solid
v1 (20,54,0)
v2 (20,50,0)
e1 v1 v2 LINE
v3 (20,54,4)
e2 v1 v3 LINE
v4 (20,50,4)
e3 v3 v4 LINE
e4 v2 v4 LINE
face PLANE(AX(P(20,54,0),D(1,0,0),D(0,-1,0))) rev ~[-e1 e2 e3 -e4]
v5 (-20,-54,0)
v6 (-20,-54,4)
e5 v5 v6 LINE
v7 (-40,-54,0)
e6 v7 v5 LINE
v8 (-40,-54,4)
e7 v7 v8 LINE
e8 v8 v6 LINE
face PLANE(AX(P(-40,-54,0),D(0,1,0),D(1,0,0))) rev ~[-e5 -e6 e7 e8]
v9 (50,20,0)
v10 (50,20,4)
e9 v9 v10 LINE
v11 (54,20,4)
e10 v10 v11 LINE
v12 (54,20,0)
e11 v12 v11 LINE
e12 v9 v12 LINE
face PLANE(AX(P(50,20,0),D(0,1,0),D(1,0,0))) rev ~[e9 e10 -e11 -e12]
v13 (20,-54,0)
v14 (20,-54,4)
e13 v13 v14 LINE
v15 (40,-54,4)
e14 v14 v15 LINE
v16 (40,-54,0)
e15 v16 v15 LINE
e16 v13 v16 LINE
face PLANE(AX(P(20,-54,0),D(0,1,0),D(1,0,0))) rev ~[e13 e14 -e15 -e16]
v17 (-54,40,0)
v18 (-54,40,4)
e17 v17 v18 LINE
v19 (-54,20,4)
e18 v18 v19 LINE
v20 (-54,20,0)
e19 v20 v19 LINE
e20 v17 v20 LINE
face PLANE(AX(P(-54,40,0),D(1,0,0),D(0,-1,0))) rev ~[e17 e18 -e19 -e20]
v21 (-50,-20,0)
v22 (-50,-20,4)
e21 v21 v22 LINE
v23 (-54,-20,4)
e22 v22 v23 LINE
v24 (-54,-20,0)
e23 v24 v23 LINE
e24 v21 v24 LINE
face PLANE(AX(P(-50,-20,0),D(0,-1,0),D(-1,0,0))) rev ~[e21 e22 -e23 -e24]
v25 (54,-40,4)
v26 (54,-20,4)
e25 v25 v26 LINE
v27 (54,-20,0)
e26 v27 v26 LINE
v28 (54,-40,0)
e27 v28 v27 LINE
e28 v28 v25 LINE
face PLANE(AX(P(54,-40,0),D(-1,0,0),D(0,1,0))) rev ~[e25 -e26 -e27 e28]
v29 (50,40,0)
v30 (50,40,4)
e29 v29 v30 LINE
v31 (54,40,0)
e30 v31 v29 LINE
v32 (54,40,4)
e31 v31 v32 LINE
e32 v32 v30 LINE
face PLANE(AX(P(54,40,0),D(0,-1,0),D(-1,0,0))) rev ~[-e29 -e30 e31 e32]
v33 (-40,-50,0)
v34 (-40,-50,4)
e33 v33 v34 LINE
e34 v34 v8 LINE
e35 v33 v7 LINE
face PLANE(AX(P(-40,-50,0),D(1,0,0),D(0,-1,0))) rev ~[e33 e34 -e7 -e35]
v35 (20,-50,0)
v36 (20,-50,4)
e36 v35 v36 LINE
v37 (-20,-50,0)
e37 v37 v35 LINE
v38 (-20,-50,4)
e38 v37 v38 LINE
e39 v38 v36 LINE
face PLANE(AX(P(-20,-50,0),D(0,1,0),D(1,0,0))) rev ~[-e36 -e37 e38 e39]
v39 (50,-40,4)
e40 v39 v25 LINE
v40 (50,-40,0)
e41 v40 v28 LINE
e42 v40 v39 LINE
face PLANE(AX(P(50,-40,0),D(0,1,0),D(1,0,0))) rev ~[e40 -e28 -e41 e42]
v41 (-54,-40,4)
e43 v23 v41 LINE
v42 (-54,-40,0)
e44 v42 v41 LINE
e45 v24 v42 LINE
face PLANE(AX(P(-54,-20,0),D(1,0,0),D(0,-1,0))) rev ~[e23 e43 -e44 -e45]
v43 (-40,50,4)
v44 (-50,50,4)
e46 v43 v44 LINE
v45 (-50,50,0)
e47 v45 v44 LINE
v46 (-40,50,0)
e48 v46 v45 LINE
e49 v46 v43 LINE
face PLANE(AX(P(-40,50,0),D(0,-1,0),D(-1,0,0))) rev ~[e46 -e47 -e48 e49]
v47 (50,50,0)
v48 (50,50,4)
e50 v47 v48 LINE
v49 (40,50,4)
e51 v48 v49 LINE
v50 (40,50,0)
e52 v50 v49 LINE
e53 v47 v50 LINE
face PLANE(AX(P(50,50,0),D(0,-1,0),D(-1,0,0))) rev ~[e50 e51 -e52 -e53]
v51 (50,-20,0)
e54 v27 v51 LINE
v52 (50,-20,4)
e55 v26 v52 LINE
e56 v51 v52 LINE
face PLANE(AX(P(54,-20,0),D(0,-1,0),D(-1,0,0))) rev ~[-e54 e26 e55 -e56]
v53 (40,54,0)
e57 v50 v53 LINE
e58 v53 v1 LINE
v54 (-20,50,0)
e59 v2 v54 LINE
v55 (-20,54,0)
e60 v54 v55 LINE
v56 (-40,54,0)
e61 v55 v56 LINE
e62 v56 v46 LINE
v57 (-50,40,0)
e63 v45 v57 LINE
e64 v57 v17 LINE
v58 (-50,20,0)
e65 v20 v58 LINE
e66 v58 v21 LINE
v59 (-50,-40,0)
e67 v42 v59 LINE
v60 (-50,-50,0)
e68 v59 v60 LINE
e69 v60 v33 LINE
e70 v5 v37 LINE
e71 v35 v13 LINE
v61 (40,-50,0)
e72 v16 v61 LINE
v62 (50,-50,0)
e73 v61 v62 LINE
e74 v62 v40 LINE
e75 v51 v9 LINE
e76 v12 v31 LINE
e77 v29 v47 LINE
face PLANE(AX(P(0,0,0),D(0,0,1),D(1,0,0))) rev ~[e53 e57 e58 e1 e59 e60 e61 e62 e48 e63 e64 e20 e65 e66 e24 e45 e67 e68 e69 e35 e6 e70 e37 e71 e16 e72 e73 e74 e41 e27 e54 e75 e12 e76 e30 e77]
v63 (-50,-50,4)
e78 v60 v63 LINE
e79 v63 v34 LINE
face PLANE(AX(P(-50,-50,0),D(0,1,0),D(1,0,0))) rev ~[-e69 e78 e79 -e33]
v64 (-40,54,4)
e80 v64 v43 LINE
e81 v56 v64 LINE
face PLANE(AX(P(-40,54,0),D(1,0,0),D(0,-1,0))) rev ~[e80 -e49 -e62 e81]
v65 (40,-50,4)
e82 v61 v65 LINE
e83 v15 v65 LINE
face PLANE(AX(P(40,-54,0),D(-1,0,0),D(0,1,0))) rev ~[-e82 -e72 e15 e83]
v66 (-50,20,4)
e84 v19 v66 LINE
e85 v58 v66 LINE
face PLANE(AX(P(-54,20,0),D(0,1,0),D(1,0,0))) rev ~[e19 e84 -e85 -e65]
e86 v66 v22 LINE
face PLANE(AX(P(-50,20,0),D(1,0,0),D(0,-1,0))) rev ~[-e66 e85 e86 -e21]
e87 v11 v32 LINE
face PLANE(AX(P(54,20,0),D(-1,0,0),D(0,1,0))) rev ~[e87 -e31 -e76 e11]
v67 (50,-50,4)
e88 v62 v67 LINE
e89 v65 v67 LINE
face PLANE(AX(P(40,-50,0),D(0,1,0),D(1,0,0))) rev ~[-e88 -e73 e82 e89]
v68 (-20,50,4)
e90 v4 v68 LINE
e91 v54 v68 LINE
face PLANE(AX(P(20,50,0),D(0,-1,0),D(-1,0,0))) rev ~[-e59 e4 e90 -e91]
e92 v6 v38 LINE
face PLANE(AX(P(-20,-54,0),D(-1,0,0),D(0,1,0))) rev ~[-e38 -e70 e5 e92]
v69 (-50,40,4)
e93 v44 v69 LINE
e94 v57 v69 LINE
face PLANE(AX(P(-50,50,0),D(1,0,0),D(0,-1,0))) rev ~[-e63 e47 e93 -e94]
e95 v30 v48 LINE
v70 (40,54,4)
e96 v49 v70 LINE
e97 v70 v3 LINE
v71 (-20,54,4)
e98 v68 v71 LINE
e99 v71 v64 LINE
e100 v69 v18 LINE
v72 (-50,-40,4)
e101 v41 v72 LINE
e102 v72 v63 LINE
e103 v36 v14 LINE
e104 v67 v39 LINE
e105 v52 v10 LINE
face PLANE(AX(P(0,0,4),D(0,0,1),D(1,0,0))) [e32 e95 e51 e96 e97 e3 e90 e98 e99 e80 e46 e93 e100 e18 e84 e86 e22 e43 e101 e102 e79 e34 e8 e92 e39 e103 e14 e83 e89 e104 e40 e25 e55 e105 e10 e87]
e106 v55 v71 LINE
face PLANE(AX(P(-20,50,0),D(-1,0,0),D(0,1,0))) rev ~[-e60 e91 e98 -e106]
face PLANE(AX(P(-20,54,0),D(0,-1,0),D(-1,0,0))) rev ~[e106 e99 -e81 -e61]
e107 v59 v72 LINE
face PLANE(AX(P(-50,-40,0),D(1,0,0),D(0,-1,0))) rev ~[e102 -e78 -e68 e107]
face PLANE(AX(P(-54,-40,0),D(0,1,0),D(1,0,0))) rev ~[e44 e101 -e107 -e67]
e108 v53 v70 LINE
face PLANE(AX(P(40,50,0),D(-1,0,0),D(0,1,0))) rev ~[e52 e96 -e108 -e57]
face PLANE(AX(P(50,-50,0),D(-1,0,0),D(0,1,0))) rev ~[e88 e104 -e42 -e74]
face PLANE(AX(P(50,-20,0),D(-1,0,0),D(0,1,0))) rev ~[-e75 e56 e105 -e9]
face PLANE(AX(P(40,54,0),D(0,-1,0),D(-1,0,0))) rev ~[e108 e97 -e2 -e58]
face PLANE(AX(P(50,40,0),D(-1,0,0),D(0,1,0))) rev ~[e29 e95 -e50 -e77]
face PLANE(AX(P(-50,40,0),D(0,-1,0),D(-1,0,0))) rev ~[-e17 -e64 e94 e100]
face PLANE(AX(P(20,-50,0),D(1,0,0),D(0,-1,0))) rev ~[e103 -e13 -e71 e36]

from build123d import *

# Parameters (mm, degrees)
F1_DEPTH = 4


# Not quite as in the source:
# - a feature names something its author has since deleted; it is built from what else it names


with BuildPart() as f1:
    # F0 (on Top) → F1 (new body)
    with BuildSketch(Plane.XY):
        Polygon((50, 40), (50, 50), (40, 50), (40, 54), (20, 54), (20, 50), (-20, 50), (-20, 54), (-40, 54), (-40, 50), (-50, 50), (-50, 40), (-54, 40), (-54, 20), (-50, 20), (-50, -20), (-54, -20), (-54, -40), (-50, -40), (-50, -50), (-40, -50), (-40, -54), (-20, -54), (-20, -50), (20, -50), (20, -54), (40, -54), (40, -50), (50, -50), (50, -40), (54, -40), (54, -20), (50, -20), (50, 20), (54, 20), (54, 40), align=None)
    extrude(amount=F1_DEPTH)


solid = f1.part
